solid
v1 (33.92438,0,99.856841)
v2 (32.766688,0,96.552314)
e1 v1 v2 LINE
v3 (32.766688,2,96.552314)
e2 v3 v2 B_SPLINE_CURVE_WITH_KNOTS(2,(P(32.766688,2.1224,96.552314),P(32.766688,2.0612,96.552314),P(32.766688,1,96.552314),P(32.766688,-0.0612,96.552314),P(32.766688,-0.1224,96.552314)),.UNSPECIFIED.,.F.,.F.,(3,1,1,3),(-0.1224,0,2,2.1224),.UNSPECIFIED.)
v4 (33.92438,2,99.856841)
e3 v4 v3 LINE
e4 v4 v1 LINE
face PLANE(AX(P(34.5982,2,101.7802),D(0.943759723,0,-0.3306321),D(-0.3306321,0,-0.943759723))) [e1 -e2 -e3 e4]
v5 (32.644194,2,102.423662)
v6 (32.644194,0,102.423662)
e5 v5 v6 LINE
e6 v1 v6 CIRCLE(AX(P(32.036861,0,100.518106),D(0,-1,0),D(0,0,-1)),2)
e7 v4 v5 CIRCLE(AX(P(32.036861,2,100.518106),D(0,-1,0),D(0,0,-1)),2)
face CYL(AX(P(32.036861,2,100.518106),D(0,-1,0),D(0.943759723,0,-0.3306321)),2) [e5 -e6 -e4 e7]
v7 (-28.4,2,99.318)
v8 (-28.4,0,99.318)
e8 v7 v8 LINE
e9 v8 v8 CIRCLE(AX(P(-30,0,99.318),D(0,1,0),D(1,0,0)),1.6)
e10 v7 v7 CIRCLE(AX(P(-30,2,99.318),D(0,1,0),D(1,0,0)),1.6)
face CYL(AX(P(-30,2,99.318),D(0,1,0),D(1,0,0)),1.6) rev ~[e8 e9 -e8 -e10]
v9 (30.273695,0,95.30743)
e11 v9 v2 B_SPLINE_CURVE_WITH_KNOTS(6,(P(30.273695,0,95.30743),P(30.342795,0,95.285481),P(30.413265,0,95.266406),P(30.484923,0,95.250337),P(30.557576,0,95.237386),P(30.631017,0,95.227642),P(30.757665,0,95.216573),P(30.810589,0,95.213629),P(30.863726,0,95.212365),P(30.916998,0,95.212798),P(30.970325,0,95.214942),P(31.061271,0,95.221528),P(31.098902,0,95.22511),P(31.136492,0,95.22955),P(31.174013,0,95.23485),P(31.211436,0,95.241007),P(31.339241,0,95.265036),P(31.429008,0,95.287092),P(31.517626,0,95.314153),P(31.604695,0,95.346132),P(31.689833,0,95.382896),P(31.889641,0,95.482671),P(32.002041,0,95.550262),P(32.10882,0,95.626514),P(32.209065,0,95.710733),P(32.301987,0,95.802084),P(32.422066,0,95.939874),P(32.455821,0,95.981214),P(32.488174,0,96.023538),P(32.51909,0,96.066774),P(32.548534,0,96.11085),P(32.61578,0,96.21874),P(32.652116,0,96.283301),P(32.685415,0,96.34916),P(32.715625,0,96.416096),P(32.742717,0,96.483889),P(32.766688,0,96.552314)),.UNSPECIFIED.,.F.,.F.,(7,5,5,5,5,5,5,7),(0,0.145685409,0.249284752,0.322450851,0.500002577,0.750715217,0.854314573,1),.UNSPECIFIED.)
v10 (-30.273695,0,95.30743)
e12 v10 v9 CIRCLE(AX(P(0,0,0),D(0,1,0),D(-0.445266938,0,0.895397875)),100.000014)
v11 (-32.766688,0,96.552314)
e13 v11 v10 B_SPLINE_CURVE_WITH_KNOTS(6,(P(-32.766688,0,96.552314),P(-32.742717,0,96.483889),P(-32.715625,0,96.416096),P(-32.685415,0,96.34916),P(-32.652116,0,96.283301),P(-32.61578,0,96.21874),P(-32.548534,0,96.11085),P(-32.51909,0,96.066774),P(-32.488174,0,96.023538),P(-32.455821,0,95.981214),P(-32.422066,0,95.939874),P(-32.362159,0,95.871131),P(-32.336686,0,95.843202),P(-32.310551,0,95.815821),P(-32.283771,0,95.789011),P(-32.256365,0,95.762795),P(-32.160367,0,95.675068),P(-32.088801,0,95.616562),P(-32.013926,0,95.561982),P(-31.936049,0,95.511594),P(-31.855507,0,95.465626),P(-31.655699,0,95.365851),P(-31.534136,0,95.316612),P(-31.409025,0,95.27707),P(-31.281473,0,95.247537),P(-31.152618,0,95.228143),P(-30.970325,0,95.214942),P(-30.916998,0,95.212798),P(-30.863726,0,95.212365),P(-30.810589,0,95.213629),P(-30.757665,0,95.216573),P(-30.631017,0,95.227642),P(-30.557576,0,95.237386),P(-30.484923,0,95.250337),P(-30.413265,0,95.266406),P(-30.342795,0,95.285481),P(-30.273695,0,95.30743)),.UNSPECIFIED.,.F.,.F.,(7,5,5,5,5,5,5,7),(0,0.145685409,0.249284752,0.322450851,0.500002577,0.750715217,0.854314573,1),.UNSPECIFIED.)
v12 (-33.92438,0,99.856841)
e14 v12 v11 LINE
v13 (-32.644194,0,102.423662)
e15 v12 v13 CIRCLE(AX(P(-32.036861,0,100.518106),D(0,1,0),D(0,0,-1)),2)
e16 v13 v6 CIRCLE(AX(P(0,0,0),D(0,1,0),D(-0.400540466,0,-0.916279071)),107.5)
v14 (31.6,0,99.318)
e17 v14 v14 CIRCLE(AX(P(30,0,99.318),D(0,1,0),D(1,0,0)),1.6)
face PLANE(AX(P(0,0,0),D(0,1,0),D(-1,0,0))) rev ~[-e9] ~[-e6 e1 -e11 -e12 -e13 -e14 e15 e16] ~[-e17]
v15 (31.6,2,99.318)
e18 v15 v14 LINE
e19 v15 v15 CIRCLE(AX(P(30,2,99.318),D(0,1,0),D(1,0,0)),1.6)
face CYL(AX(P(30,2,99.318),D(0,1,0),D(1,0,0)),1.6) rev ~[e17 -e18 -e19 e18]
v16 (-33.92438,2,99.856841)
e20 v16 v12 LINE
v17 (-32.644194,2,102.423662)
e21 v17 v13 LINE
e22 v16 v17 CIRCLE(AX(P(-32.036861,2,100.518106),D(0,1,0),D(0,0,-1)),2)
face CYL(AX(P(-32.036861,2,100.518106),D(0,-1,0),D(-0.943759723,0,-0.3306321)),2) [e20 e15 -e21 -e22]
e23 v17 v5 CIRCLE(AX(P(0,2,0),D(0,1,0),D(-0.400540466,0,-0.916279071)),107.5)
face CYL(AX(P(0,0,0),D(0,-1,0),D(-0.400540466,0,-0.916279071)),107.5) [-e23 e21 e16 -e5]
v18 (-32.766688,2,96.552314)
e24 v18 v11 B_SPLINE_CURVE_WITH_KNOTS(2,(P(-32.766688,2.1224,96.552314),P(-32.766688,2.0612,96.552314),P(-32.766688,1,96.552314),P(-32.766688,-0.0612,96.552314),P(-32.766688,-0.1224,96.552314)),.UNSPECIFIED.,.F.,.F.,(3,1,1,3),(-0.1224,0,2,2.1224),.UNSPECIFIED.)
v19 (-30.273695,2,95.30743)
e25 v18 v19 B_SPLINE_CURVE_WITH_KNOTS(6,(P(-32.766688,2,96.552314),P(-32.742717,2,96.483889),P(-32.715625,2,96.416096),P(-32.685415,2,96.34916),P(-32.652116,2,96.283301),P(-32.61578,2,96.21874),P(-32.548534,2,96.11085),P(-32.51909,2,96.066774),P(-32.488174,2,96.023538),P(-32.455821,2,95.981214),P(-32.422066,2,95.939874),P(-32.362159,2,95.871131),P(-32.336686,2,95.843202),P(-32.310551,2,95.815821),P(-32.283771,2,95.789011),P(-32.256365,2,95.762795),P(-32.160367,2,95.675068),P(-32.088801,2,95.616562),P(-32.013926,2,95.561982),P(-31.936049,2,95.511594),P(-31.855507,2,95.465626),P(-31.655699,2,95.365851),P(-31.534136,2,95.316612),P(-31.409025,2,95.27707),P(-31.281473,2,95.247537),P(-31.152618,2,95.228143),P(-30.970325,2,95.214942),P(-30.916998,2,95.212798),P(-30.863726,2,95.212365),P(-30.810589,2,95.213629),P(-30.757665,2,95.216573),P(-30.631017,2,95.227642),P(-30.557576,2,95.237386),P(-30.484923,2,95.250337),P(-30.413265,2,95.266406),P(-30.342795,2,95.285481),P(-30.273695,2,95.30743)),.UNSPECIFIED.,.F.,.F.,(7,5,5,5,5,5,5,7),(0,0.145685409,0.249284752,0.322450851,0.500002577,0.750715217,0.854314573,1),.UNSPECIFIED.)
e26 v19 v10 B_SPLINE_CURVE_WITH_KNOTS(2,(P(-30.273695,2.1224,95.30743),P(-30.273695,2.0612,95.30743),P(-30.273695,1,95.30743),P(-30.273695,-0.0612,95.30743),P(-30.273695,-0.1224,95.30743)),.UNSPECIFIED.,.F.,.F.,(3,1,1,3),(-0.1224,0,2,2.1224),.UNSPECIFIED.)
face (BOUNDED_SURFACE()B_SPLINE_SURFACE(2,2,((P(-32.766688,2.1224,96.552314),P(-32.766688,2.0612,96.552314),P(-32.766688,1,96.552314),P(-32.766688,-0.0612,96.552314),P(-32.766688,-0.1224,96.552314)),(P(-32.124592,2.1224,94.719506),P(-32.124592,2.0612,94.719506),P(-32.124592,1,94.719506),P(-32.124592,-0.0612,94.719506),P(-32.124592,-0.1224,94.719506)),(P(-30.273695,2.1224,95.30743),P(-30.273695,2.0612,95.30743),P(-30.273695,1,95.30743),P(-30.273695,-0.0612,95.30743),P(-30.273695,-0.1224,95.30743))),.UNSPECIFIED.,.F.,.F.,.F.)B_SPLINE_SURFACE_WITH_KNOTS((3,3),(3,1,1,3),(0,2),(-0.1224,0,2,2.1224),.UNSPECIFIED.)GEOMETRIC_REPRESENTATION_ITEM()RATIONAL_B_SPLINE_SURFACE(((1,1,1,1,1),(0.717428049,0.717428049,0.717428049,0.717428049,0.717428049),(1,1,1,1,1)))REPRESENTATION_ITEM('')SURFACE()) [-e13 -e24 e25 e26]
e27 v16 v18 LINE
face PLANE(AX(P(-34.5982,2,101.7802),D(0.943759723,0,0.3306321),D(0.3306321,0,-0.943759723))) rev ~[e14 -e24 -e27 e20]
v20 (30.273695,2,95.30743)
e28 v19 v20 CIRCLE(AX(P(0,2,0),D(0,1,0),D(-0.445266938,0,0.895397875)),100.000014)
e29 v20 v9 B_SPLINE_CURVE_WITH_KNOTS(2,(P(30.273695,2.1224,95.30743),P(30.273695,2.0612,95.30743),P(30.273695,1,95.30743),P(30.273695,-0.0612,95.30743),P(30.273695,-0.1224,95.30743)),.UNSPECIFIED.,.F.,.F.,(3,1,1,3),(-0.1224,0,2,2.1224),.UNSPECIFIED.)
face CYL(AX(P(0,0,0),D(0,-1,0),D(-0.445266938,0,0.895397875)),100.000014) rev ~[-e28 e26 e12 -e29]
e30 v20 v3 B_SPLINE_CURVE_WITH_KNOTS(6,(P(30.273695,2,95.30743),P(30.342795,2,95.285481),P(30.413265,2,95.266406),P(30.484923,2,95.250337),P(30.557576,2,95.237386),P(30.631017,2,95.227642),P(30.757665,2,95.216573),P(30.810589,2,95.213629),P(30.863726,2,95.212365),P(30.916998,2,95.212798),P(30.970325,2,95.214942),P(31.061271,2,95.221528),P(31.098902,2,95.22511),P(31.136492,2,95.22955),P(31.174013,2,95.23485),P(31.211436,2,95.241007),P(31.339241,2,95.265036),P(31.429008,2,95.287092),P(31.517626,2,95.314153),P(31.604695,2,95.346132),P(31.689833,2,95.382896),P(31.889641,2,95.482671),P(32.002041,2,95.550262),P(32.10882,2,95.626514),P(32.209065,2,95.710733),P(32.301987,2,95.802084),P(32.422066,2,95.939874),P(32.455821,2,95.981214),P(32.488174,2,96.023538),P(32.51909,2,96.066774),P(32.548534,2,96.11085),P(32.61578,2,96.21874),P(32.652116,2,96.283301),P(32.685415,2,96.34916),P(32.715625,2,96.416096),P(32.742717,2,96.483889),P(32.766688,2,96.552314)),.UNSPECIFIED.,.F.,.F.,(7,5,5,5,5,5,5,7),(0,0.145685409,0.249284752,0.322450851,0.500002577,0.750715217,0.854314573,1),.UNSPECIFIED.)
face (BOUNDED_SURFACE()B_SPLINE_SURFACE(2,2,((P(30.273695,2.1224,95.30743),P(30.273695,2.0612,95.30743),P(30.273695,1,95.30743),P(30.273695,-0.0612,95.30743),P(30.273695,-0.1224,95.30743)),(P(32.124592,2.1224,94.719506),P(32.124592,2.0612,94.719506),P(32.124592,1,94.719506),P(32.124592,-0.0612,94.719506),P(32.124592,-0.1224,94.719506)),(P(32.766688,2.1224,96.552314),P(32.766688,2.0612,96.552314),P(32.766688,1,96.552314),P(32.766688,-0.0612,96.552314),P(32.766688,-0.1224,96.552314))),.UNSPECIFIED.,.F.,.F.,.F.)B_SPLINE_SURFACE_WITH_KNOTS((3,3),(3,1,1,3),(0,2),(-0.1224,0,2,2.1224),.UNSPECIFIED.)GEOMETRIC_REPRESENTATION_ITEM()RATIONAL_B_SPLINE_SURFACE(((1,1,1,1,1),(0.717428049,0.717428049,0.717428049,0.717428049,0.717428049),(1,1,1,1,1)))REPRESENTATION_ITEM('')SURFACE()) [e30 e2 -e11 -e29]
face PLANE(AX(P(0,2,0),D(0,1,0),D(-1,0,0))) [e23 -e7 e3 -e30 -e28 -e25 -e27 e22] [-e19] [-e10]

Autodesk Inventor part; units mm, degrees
ref_plane "YZ Plane" through (0, 0, 0) normal (1, 0, 0) x (0, 1, 0)
ref_plane "XZ Plane" through (0, 0, 0) normal (0, 1, 0) x (-1, 0, 0)
ref_plane "XY Plane" through (0, 0, 0) normal (0, 0, 1) x (1, 0, 0)
sketch "Sketch1" plane through (0, 0, 0) normal (0, 1, 0) x (-1, 0, 0)
  circle A0 centre (0, 0) radius 110 construction
  arc A1 (43.0581, -98.5) -> (-43.0581, -98.5) centre (0, 0) ccw
  line L0 (0, -107.5) -> (0, -98.5) construction
  line L1 (0, -98.5) -> (0, -73.5) construction
  line L2 (0, -98.5) -> (-43.0581, -98.5) construction
  line L3 (0, -98.5) -> (43.0581, -98.5) construction
  line L4 (43.0581, -98.5) -> (-43.0581, -98.5) construction
  line L5 (-18.0581, -73.5) -> (18.0581, -73.5)
  arc A2 (43.0581, -98.5) -> (18.0581, -73.5) centre (18.0581, -98.5) ccw
  arc A3 (-18.0581, -73.5) -> (-43.0581, -98.5) centre (-18.0581, -98.5) ccw
  line L6 (0, 107.5) -> (0, 97.5) construction
  line L7 (0, 97.5) -> (-22.5, 97.5) construction
  line L8 (-22.5, 97.5) -> (-22.5, 82.5) construction
  line L9 (22.5, 82.5) -> (22.5, 97.5) construction
  line L10 (22.5, 90) -> (-22.5, 90) construction
  line L11 (15, 97.5) -> (-15, 97.5)
  line L12 (-15, 82.5) -> (15, 82.5)
  arc A4 (15, 82.5) -> (15, 97.5) centre (15, 90) ccw
  arc A5 (-15, 97.5) -> (-15, 82.5) centre (-15, 90) ccw
  line L13 (22.5, 82.5) -> (17.5, 82.5) construction
  line L14 (17.5, 82.5) -> (17.5, 77.5) construction
  circle A6 centre (17.5, 77.5) radius 1.6
  circle A7 centre (-17.5, 77.5) radius 1.6
  line L15 (-58.3363, 79.5495) -> (-79.5495, 58.3363)
  arc A8 (-47.7297, 68.9429) -> (-58.3363, 79.5495) centre (-53.033, 74.2462) ccw
  arc A9 (-79.5495, 58.3363) -> (-68.9429, 47.7297) centre (-74.2462, 53.033) ccw
  line L16 (-68.9429, 47.7297) -> (-47.7297, 68.9429)
  circle A10 centre (-67.1751, 42.4264) radius 1.6
  circle A11 centre (-42.4264, 67.1751) radius 1.6
  line L17 (-97.5, 15) -> (-97.5, -15)
  arc A12 (-82.5, 15) -> (-97.5, 15) centre (-90, 15) ccw
  arc A13 (-97.5, -15) -> (-82.5, -15) centre (-90, -15) ccw
  line L18 (-82.5, -15) -> (-82.5, 15)
  circle A14 centre (-77.5, -17.5) radius 1.6
  circle A15 centre (-77.5, 17.5) radius 1.6
  line L19 (-79.5495, -58.3363) -> (-58.3363, -79.5495)
  arc A16 (-68.9429, -47.7297) -> (-79.5495, -58.3363) centre (-74.2462, -53.033) ccw
  arc A17 (-58.3363, -79.5495) -> (-47.7297, -68.9429) centre (-53.033, -74.2462) ccw
  line L20 (-47.7297, -68.9429) -> (-68.9429, -47.7297)
  circle A18 centre (-42.4264, -67.1751) radius 1.6
  circle A19 centre (-67.1751, -42.4264) radius 1.6
  line L21 (-15, -97.5) -> (15, -97.5)
  arc A20 (-15, -82.5) -> (-15, -97.5) centre (-15, -90) ccw
  arc A21 (15, -97.5) -> (15, -82.5) centre (15, -90) ccw
  line L22 (15, -82.5) -> (-15, -82.5)
  circle A22 centre (17.5, -77.5) radius 1.6
  circle A23 centre (-17.5, -77.5) radius 1.6
  line L23 (58.3363, -79.5495) -> (79.5495, -58.3363)
  arc A24 (47.7297, -68.9429) -> (58.3363, -79.5495) centre (53.033, -74.2462) ccw
  arc A25 (79.5495, -58.3363) -> (68.9429, -47.7297) centre (74.2462, -53.033) ccw
  line L24 (68.9429, -47.7297) -> (47.7297, -68.9429)
  circle A26 centre (67.1751, -42.4264) radius 1.6
  circle A27 centre (42.4264, -67.1751) radius 1.6
  line L25 (97.5, -15) -> (97.5, 15)
  arc A28 (82.5, -15) -> (97.5, -15) centre (90, -15) ccw
  arc A29 (97.5, 15) -> (82.5, 15) centre (90, 15) ccw
  line L26 (82.5, 15) -> (82.5, -15)
  circle A30 centre (77.5, 17.5) radius 1.6
  circle A31 centre (77.5, -17.5) radius 1.6
  line L27 (79.5495, 58.3363) -> (58.3363, 79.5495)
  arc A32 (68.9429, 47.7297) -> (79.5495, 58.3363) centre (74.2462, 53.033) ccw
  arc A33 (58.3363, 79.5495) -> (47.7297, 68.9429) centre (53.033, 74.2462) ccw
  line L28 (47.7297, 68.9429) -> (68.9429, 47.7297)
  circle A34 centre (42.4264, 67.1751) radius 1.6
  circle A35 centre (67.1751, 42.4264) radius 1.6
  line L29 (58.3363, -58.3363) -> (51.2652, -51.2652) construction
  line L30 (40.6586, -61.8718) -> (61.8718, -40.6586)
  arc A36 (40.6586, -61.8718) -> (44.5267, -89.5398) centre (53.033, -74.2462) ccw
  arc A37 (89.5398, -44.5267) -> (61.8718, -40.6586) centre (74.2462, -53.033) ccw
  line L31 (0, -73.5) -> (0, -66.5) construction
  arc A38 (44.5267, 89.5398) -> (40.6586, 61.8718) centre (53.033, 74.2462) ccw
  line L32 (61.8718, 40.6586) -> (40.6586, 61.8718)
  arc A39 (61.8718, 40.6586) -> (89.5398, 44.5267) centre (74.2462, 53.033) ccw
  arc A40 (-89.5398, 44.5267) -> (-61.8718, 40.6586) centre (-74.2462, 53.033) ccw
  line L33 (-40.6586, 61.8718) -> (-61.8718, 40.6586)
  arc A41 (-40.6586, 61.8718) -> (-44.5267, 89.5398) centre (-53.033, 74.2462) ccw
  arc A42 (-44.5267, -89.5398) -> (-40.6586, -61.8718) centre (-53.033, -74.2462) ccw
  line L34 (-61.8718, -40.6586) -> (-40.6586, -61.8718)
  arc A43 (-61.8718, -40.6586) -> (-89.5398, -44.5267) centre (-74.2462, -53.033) ccw
  arc A44 (89.5398, -44.5267) -> (89.5398, 44.5267) centre (0, 0) ccw
  arc A45 (44.5267, 89.5398) -> (-44.5267, 89.5398) centre (0, 0) ccw
  arc A46 (-89.5398, 44.5267) -> (-89.5398, -44.5267) centre (0, 0) ccw
  line L35 (43.0581, -98.5) -> (48.0581, -98.5) construction
  line L36 (48.0581, -98.5) -> (48.0581, -88.5) construction
  circle A47 centre (48.0581, -88.5) radius 1.6
  circle A48 centre (-48.0581, -88.5) radius 1.6
  line L37 (18.0581, -66.5) -> (-18.0581, -66.5)
  arc A49 (17.5, -66.5) -> (43.0581, -59.4724) centre (19.5145, -23.8377) ccw
  arc A50 (-44.5267, -58.0038) -> (-18.0581, -66.5) centre (-19.5089, -25.5422) ccw
  point P0 (0, 90)
  point P1 (-45.9619, 70.7107)
  point P2 (-82.5, 17.5)
  point P3 (-70.7107, -45.9619)
  point P4 (-17.5, -82.5)
  point P5 (45.9619, -70.7107)
  point P6 (82.5, -17.5)
  point P7 (70.7107, 45.9619)
  point P8 (35.7159, -76.7698)
  dimension "d0" = 220
  dimension "d1" = 215
  dimension "d2" = 9
  dimension "d3" = 25
  dimension "d4" = 10
  dimension "d5" = 22.5
  dimension "d6" = 15
  dimension "d7" = 45
  dimension "d8" = 5
  dimension "d9" = 5
  dimension "d10" = 3.2
  dimension "d15" = 86.1162
  dimension "d16" = 45
  dimension "d19" = 360
  dimension "d22" = 10
  dimension "d23" = 7
  dimension "d26" = 360
  dimension "d33" = 5
  dimension "d34" = 10
  dimension "d35" = 3.2
extrude "Extrusion1" add sketch "Sketch1" along normal blind 2 contours A2 L5 A3 A1
fillet "Fillet2" radius 2 6 edges at (-44.5267, 1, 89.5398) (44.5267, 1, 89.5398) (89.5398, 1, 44.5267) (89.5398, 1, -44.5267) (-89.5398, 1, -44.5267) (-89.5398, 1, 44.5267)
sketch "Sketch4" plane through (0, 2, 0) normal (0, 1, 0) x (1, 0, 0)
  circle A0 centre (0, 0) radius 103.75 construction
  line L0 (0, -103.75) -> (-30, -103.75) construction
  line L1 (-30, -103.75) -> (-30, -99.318) construction
  line L2 (0, -103.75) -> (0, -91.6543) construction
  line L3 (0, 0) -> (-10.2863, 0) construction
  circle A1 centre (-30, -99.318) radius 1.6
  circle A2 centre (30, -99.318) radius 1.6
  circle A3 centre (99.318, -30) radius 1.6
  circle A4 centre (99.318, 30) radius 1.6
  circle A5 centre (-99.318, -30) radius 1.6
  circle A6 centre (-99.318, 30) radius 1.6
  dimension "d45" = 207.5
  dimension "d46" = 30
  dimension "d47" = 3.2
  dimension "d50" = 90
extrude "Extrusion4" cut sketch "Sketch4" against normal blind 2
sketch "Sketch5" plane through (0, 2, 0) normal (0, 1, 0) x (1, 0, 0)
  circle A0 centre (0, 0) radius 100
  arc A1 (-41.3697, -91.0415) -> (41.3697, -91.0415) centre (0, 0) ccw projected
  circle A2 centre (0, 0) radius 107.5
  circle A3 centre (-30, -99.318) radius 1.6 construction
  circle A4 centre (-30, -99.318) radius 1.6 construction
  circle A5 centre (30, -99.318) radius 1.6 construction
  circle A6 centre (30, -99.318) radius 1.6 construction
  circle A7 centre (-22.8014, -101.2134) radius 1.6
  arc A8 (-30, -99.318) -> (-22.8014, -101.2134) centre (0, 0) ccw construction
  line L0 (-26.4177, -100.3303) -> (-25.4629, -96.7039) construction
  line L1 (-26.4177, -100.3303) -> (-24.1782, -100.92) construction
  line L2 (-26.4177, -100.3303) -> (-27.3726, -103.9567) construction
  line L3 (0, -100) -> (0, -107.5) construction
  arc A9 (-43.0581, 98.5) -> (43.0581, 98.5) centre (0, 0) ccw construction
  line L4 (-28.3384, -103.6976) -> (-26.4299, -96.4493)
  line L5 (-26.4299, -96.4493) -> (-24.4958, -96.9585) construction
  line L6 (-24.4958, -96.9585) -> (-26.4044, -104.2068)
  line L7 (-26.4055, -104.2113) -> (-28.3396, -103.7021) construction
  line L8 (-28.3396, -103.7021) -> (-24.4958, -96.9585) construction
  line L9 (-26.4299, -96.4493) -> (-26.4055, -104.2113) construction
  line L10 (-26.4299, -96.4493) -> (-26.4286, -96.4444)
  line L11 (-24.4958, -96.9585) -> (-24.4946, -96.9537)
  line L12 (28.3384, -103.6976) -> (26.4299, -96.4493)
  line L13 (24.4958, -96.9585) -> (26.4044, -104.2068)
  line L14 (26.4299, -96.4493) -> (26.4286, -96.4444)
  line L15 (24.4958, -96.9585) -> (24.4946, -96.9537)
  circle A10 centre (22.8014, -101.2134) radius 1.6
  arc A11 (-38.542, -96.3254) -> (-30, -99.318) centre (0, 0) ccw construction
  line L16 (0, 0) -> (-38.542, -96.3254) construction
  line L17 (0, 0) -> (-30, -99.318) construction
  line L18 (-34.3036, -97.9149) -> (-40.5197, -95.7371) construction
  line L19 (-34.3036, -97.9149) -> (-33.0637, -94.3758) construction
  line L20 (-34.3036, -97.9149) -> (-35.5435, -101.454) construction
  line L21 (-34.5982, -101.7802) -> (-32.12, -94.7064)
  line L22 (-34.0075, -94.0451) -> (-36.4857, -101.1189)
  line L23 (-34.5998, -101.7846) -> (-34.0075, -94.0451) construction
  line L24 (-32.12, -94.7064) -> (-36.4873, -101.1233) construction
  line L25 (-34.0075, -94.0451) -> (-34.0059, -94.0404)
  line L26 (-32.12, -94.7064) -> (-32.1183, -94.7017)
  line L27 (34.5982, -101.7802) -> (32.12, -94.7064)
  line L28 (34.0075, -94.0451) -> (36.4857, -101.1189)
  line L29 (34.0075, -94.0451) -> (34.0059, -94.0404)
  line L30 (32.12, -94.7064) -> (32.1183, -94.7017)
  dimension "d54" = 3.2
  dimension "d56" = 90
  dimension "d57" = 90
  dimension "d58" = 2
  dimension "d62" = 5
  dimension "d63" = 90
  dimension "d64" = 90
  dimension "d65" = 2
extrude "Extrusion6" cut sketch "Sketch5" against normal blind 10 contours A0 L26 L21 A2 L22 L25 | L29 L28 A2 L27 L30 A0
fillet "Fillet4" radius 2 4 edges at (34.5982, 1, 101.7802) (32.1183, 1, 94.7017) (-34.5982, 1, 101.7802) (-32.1183, 1, 94.7017)
sketch "Sketch6" plane through (0, 2, 0) normal (0, 1, 0) x (1, 0, 0)
  line L0 (-36.4857, -101.1189) -> (-34.0059, -94.0404) projected
  line L1 (-36.4857, -101.1189) -> (-34.0059, -94.0404)
  line L2 (-34.0059, -94.0404) -> (32.6146, -91.3584)
  arc A0 (34.0059, -94.0404) -> (41.3697, -91.0415) centre (0, 0) ccw projected
  line L3 (32.6146, -91.3584) -> (34.0059, -94.0404)
  line L4 (34.0059, -94.0404) -> (36.4857, -101.1189) projected
  line L5 (34.0059, -94.0404) -> (36.4857, -101.1189)
  line L6 (36.4857, -101.1189) -> (62.3564, -110.1825)
  line L7 (62.3564, -110.1825) -> (150.1312, 20.0804)
  line L8 (150.1312, 20.0804) -> (83.4633, 106.272)
  line L9 (83.4633, 106.272) -> (-86.1797, 106.272)
  line L10 (-86.1797, 106.272) -> (-127.6527, -26.6706)
  line L11 (-127.6527, -26.6706) -> (-61.5058, -119.0367)
  line L12 (-61.5058, -119.0367) -> (-36.4857, -101.1189)
extrude "Extrusion7" cut sketch "Sketch6" against normal blind 10
properties part number "MettalringUnten_v3"
